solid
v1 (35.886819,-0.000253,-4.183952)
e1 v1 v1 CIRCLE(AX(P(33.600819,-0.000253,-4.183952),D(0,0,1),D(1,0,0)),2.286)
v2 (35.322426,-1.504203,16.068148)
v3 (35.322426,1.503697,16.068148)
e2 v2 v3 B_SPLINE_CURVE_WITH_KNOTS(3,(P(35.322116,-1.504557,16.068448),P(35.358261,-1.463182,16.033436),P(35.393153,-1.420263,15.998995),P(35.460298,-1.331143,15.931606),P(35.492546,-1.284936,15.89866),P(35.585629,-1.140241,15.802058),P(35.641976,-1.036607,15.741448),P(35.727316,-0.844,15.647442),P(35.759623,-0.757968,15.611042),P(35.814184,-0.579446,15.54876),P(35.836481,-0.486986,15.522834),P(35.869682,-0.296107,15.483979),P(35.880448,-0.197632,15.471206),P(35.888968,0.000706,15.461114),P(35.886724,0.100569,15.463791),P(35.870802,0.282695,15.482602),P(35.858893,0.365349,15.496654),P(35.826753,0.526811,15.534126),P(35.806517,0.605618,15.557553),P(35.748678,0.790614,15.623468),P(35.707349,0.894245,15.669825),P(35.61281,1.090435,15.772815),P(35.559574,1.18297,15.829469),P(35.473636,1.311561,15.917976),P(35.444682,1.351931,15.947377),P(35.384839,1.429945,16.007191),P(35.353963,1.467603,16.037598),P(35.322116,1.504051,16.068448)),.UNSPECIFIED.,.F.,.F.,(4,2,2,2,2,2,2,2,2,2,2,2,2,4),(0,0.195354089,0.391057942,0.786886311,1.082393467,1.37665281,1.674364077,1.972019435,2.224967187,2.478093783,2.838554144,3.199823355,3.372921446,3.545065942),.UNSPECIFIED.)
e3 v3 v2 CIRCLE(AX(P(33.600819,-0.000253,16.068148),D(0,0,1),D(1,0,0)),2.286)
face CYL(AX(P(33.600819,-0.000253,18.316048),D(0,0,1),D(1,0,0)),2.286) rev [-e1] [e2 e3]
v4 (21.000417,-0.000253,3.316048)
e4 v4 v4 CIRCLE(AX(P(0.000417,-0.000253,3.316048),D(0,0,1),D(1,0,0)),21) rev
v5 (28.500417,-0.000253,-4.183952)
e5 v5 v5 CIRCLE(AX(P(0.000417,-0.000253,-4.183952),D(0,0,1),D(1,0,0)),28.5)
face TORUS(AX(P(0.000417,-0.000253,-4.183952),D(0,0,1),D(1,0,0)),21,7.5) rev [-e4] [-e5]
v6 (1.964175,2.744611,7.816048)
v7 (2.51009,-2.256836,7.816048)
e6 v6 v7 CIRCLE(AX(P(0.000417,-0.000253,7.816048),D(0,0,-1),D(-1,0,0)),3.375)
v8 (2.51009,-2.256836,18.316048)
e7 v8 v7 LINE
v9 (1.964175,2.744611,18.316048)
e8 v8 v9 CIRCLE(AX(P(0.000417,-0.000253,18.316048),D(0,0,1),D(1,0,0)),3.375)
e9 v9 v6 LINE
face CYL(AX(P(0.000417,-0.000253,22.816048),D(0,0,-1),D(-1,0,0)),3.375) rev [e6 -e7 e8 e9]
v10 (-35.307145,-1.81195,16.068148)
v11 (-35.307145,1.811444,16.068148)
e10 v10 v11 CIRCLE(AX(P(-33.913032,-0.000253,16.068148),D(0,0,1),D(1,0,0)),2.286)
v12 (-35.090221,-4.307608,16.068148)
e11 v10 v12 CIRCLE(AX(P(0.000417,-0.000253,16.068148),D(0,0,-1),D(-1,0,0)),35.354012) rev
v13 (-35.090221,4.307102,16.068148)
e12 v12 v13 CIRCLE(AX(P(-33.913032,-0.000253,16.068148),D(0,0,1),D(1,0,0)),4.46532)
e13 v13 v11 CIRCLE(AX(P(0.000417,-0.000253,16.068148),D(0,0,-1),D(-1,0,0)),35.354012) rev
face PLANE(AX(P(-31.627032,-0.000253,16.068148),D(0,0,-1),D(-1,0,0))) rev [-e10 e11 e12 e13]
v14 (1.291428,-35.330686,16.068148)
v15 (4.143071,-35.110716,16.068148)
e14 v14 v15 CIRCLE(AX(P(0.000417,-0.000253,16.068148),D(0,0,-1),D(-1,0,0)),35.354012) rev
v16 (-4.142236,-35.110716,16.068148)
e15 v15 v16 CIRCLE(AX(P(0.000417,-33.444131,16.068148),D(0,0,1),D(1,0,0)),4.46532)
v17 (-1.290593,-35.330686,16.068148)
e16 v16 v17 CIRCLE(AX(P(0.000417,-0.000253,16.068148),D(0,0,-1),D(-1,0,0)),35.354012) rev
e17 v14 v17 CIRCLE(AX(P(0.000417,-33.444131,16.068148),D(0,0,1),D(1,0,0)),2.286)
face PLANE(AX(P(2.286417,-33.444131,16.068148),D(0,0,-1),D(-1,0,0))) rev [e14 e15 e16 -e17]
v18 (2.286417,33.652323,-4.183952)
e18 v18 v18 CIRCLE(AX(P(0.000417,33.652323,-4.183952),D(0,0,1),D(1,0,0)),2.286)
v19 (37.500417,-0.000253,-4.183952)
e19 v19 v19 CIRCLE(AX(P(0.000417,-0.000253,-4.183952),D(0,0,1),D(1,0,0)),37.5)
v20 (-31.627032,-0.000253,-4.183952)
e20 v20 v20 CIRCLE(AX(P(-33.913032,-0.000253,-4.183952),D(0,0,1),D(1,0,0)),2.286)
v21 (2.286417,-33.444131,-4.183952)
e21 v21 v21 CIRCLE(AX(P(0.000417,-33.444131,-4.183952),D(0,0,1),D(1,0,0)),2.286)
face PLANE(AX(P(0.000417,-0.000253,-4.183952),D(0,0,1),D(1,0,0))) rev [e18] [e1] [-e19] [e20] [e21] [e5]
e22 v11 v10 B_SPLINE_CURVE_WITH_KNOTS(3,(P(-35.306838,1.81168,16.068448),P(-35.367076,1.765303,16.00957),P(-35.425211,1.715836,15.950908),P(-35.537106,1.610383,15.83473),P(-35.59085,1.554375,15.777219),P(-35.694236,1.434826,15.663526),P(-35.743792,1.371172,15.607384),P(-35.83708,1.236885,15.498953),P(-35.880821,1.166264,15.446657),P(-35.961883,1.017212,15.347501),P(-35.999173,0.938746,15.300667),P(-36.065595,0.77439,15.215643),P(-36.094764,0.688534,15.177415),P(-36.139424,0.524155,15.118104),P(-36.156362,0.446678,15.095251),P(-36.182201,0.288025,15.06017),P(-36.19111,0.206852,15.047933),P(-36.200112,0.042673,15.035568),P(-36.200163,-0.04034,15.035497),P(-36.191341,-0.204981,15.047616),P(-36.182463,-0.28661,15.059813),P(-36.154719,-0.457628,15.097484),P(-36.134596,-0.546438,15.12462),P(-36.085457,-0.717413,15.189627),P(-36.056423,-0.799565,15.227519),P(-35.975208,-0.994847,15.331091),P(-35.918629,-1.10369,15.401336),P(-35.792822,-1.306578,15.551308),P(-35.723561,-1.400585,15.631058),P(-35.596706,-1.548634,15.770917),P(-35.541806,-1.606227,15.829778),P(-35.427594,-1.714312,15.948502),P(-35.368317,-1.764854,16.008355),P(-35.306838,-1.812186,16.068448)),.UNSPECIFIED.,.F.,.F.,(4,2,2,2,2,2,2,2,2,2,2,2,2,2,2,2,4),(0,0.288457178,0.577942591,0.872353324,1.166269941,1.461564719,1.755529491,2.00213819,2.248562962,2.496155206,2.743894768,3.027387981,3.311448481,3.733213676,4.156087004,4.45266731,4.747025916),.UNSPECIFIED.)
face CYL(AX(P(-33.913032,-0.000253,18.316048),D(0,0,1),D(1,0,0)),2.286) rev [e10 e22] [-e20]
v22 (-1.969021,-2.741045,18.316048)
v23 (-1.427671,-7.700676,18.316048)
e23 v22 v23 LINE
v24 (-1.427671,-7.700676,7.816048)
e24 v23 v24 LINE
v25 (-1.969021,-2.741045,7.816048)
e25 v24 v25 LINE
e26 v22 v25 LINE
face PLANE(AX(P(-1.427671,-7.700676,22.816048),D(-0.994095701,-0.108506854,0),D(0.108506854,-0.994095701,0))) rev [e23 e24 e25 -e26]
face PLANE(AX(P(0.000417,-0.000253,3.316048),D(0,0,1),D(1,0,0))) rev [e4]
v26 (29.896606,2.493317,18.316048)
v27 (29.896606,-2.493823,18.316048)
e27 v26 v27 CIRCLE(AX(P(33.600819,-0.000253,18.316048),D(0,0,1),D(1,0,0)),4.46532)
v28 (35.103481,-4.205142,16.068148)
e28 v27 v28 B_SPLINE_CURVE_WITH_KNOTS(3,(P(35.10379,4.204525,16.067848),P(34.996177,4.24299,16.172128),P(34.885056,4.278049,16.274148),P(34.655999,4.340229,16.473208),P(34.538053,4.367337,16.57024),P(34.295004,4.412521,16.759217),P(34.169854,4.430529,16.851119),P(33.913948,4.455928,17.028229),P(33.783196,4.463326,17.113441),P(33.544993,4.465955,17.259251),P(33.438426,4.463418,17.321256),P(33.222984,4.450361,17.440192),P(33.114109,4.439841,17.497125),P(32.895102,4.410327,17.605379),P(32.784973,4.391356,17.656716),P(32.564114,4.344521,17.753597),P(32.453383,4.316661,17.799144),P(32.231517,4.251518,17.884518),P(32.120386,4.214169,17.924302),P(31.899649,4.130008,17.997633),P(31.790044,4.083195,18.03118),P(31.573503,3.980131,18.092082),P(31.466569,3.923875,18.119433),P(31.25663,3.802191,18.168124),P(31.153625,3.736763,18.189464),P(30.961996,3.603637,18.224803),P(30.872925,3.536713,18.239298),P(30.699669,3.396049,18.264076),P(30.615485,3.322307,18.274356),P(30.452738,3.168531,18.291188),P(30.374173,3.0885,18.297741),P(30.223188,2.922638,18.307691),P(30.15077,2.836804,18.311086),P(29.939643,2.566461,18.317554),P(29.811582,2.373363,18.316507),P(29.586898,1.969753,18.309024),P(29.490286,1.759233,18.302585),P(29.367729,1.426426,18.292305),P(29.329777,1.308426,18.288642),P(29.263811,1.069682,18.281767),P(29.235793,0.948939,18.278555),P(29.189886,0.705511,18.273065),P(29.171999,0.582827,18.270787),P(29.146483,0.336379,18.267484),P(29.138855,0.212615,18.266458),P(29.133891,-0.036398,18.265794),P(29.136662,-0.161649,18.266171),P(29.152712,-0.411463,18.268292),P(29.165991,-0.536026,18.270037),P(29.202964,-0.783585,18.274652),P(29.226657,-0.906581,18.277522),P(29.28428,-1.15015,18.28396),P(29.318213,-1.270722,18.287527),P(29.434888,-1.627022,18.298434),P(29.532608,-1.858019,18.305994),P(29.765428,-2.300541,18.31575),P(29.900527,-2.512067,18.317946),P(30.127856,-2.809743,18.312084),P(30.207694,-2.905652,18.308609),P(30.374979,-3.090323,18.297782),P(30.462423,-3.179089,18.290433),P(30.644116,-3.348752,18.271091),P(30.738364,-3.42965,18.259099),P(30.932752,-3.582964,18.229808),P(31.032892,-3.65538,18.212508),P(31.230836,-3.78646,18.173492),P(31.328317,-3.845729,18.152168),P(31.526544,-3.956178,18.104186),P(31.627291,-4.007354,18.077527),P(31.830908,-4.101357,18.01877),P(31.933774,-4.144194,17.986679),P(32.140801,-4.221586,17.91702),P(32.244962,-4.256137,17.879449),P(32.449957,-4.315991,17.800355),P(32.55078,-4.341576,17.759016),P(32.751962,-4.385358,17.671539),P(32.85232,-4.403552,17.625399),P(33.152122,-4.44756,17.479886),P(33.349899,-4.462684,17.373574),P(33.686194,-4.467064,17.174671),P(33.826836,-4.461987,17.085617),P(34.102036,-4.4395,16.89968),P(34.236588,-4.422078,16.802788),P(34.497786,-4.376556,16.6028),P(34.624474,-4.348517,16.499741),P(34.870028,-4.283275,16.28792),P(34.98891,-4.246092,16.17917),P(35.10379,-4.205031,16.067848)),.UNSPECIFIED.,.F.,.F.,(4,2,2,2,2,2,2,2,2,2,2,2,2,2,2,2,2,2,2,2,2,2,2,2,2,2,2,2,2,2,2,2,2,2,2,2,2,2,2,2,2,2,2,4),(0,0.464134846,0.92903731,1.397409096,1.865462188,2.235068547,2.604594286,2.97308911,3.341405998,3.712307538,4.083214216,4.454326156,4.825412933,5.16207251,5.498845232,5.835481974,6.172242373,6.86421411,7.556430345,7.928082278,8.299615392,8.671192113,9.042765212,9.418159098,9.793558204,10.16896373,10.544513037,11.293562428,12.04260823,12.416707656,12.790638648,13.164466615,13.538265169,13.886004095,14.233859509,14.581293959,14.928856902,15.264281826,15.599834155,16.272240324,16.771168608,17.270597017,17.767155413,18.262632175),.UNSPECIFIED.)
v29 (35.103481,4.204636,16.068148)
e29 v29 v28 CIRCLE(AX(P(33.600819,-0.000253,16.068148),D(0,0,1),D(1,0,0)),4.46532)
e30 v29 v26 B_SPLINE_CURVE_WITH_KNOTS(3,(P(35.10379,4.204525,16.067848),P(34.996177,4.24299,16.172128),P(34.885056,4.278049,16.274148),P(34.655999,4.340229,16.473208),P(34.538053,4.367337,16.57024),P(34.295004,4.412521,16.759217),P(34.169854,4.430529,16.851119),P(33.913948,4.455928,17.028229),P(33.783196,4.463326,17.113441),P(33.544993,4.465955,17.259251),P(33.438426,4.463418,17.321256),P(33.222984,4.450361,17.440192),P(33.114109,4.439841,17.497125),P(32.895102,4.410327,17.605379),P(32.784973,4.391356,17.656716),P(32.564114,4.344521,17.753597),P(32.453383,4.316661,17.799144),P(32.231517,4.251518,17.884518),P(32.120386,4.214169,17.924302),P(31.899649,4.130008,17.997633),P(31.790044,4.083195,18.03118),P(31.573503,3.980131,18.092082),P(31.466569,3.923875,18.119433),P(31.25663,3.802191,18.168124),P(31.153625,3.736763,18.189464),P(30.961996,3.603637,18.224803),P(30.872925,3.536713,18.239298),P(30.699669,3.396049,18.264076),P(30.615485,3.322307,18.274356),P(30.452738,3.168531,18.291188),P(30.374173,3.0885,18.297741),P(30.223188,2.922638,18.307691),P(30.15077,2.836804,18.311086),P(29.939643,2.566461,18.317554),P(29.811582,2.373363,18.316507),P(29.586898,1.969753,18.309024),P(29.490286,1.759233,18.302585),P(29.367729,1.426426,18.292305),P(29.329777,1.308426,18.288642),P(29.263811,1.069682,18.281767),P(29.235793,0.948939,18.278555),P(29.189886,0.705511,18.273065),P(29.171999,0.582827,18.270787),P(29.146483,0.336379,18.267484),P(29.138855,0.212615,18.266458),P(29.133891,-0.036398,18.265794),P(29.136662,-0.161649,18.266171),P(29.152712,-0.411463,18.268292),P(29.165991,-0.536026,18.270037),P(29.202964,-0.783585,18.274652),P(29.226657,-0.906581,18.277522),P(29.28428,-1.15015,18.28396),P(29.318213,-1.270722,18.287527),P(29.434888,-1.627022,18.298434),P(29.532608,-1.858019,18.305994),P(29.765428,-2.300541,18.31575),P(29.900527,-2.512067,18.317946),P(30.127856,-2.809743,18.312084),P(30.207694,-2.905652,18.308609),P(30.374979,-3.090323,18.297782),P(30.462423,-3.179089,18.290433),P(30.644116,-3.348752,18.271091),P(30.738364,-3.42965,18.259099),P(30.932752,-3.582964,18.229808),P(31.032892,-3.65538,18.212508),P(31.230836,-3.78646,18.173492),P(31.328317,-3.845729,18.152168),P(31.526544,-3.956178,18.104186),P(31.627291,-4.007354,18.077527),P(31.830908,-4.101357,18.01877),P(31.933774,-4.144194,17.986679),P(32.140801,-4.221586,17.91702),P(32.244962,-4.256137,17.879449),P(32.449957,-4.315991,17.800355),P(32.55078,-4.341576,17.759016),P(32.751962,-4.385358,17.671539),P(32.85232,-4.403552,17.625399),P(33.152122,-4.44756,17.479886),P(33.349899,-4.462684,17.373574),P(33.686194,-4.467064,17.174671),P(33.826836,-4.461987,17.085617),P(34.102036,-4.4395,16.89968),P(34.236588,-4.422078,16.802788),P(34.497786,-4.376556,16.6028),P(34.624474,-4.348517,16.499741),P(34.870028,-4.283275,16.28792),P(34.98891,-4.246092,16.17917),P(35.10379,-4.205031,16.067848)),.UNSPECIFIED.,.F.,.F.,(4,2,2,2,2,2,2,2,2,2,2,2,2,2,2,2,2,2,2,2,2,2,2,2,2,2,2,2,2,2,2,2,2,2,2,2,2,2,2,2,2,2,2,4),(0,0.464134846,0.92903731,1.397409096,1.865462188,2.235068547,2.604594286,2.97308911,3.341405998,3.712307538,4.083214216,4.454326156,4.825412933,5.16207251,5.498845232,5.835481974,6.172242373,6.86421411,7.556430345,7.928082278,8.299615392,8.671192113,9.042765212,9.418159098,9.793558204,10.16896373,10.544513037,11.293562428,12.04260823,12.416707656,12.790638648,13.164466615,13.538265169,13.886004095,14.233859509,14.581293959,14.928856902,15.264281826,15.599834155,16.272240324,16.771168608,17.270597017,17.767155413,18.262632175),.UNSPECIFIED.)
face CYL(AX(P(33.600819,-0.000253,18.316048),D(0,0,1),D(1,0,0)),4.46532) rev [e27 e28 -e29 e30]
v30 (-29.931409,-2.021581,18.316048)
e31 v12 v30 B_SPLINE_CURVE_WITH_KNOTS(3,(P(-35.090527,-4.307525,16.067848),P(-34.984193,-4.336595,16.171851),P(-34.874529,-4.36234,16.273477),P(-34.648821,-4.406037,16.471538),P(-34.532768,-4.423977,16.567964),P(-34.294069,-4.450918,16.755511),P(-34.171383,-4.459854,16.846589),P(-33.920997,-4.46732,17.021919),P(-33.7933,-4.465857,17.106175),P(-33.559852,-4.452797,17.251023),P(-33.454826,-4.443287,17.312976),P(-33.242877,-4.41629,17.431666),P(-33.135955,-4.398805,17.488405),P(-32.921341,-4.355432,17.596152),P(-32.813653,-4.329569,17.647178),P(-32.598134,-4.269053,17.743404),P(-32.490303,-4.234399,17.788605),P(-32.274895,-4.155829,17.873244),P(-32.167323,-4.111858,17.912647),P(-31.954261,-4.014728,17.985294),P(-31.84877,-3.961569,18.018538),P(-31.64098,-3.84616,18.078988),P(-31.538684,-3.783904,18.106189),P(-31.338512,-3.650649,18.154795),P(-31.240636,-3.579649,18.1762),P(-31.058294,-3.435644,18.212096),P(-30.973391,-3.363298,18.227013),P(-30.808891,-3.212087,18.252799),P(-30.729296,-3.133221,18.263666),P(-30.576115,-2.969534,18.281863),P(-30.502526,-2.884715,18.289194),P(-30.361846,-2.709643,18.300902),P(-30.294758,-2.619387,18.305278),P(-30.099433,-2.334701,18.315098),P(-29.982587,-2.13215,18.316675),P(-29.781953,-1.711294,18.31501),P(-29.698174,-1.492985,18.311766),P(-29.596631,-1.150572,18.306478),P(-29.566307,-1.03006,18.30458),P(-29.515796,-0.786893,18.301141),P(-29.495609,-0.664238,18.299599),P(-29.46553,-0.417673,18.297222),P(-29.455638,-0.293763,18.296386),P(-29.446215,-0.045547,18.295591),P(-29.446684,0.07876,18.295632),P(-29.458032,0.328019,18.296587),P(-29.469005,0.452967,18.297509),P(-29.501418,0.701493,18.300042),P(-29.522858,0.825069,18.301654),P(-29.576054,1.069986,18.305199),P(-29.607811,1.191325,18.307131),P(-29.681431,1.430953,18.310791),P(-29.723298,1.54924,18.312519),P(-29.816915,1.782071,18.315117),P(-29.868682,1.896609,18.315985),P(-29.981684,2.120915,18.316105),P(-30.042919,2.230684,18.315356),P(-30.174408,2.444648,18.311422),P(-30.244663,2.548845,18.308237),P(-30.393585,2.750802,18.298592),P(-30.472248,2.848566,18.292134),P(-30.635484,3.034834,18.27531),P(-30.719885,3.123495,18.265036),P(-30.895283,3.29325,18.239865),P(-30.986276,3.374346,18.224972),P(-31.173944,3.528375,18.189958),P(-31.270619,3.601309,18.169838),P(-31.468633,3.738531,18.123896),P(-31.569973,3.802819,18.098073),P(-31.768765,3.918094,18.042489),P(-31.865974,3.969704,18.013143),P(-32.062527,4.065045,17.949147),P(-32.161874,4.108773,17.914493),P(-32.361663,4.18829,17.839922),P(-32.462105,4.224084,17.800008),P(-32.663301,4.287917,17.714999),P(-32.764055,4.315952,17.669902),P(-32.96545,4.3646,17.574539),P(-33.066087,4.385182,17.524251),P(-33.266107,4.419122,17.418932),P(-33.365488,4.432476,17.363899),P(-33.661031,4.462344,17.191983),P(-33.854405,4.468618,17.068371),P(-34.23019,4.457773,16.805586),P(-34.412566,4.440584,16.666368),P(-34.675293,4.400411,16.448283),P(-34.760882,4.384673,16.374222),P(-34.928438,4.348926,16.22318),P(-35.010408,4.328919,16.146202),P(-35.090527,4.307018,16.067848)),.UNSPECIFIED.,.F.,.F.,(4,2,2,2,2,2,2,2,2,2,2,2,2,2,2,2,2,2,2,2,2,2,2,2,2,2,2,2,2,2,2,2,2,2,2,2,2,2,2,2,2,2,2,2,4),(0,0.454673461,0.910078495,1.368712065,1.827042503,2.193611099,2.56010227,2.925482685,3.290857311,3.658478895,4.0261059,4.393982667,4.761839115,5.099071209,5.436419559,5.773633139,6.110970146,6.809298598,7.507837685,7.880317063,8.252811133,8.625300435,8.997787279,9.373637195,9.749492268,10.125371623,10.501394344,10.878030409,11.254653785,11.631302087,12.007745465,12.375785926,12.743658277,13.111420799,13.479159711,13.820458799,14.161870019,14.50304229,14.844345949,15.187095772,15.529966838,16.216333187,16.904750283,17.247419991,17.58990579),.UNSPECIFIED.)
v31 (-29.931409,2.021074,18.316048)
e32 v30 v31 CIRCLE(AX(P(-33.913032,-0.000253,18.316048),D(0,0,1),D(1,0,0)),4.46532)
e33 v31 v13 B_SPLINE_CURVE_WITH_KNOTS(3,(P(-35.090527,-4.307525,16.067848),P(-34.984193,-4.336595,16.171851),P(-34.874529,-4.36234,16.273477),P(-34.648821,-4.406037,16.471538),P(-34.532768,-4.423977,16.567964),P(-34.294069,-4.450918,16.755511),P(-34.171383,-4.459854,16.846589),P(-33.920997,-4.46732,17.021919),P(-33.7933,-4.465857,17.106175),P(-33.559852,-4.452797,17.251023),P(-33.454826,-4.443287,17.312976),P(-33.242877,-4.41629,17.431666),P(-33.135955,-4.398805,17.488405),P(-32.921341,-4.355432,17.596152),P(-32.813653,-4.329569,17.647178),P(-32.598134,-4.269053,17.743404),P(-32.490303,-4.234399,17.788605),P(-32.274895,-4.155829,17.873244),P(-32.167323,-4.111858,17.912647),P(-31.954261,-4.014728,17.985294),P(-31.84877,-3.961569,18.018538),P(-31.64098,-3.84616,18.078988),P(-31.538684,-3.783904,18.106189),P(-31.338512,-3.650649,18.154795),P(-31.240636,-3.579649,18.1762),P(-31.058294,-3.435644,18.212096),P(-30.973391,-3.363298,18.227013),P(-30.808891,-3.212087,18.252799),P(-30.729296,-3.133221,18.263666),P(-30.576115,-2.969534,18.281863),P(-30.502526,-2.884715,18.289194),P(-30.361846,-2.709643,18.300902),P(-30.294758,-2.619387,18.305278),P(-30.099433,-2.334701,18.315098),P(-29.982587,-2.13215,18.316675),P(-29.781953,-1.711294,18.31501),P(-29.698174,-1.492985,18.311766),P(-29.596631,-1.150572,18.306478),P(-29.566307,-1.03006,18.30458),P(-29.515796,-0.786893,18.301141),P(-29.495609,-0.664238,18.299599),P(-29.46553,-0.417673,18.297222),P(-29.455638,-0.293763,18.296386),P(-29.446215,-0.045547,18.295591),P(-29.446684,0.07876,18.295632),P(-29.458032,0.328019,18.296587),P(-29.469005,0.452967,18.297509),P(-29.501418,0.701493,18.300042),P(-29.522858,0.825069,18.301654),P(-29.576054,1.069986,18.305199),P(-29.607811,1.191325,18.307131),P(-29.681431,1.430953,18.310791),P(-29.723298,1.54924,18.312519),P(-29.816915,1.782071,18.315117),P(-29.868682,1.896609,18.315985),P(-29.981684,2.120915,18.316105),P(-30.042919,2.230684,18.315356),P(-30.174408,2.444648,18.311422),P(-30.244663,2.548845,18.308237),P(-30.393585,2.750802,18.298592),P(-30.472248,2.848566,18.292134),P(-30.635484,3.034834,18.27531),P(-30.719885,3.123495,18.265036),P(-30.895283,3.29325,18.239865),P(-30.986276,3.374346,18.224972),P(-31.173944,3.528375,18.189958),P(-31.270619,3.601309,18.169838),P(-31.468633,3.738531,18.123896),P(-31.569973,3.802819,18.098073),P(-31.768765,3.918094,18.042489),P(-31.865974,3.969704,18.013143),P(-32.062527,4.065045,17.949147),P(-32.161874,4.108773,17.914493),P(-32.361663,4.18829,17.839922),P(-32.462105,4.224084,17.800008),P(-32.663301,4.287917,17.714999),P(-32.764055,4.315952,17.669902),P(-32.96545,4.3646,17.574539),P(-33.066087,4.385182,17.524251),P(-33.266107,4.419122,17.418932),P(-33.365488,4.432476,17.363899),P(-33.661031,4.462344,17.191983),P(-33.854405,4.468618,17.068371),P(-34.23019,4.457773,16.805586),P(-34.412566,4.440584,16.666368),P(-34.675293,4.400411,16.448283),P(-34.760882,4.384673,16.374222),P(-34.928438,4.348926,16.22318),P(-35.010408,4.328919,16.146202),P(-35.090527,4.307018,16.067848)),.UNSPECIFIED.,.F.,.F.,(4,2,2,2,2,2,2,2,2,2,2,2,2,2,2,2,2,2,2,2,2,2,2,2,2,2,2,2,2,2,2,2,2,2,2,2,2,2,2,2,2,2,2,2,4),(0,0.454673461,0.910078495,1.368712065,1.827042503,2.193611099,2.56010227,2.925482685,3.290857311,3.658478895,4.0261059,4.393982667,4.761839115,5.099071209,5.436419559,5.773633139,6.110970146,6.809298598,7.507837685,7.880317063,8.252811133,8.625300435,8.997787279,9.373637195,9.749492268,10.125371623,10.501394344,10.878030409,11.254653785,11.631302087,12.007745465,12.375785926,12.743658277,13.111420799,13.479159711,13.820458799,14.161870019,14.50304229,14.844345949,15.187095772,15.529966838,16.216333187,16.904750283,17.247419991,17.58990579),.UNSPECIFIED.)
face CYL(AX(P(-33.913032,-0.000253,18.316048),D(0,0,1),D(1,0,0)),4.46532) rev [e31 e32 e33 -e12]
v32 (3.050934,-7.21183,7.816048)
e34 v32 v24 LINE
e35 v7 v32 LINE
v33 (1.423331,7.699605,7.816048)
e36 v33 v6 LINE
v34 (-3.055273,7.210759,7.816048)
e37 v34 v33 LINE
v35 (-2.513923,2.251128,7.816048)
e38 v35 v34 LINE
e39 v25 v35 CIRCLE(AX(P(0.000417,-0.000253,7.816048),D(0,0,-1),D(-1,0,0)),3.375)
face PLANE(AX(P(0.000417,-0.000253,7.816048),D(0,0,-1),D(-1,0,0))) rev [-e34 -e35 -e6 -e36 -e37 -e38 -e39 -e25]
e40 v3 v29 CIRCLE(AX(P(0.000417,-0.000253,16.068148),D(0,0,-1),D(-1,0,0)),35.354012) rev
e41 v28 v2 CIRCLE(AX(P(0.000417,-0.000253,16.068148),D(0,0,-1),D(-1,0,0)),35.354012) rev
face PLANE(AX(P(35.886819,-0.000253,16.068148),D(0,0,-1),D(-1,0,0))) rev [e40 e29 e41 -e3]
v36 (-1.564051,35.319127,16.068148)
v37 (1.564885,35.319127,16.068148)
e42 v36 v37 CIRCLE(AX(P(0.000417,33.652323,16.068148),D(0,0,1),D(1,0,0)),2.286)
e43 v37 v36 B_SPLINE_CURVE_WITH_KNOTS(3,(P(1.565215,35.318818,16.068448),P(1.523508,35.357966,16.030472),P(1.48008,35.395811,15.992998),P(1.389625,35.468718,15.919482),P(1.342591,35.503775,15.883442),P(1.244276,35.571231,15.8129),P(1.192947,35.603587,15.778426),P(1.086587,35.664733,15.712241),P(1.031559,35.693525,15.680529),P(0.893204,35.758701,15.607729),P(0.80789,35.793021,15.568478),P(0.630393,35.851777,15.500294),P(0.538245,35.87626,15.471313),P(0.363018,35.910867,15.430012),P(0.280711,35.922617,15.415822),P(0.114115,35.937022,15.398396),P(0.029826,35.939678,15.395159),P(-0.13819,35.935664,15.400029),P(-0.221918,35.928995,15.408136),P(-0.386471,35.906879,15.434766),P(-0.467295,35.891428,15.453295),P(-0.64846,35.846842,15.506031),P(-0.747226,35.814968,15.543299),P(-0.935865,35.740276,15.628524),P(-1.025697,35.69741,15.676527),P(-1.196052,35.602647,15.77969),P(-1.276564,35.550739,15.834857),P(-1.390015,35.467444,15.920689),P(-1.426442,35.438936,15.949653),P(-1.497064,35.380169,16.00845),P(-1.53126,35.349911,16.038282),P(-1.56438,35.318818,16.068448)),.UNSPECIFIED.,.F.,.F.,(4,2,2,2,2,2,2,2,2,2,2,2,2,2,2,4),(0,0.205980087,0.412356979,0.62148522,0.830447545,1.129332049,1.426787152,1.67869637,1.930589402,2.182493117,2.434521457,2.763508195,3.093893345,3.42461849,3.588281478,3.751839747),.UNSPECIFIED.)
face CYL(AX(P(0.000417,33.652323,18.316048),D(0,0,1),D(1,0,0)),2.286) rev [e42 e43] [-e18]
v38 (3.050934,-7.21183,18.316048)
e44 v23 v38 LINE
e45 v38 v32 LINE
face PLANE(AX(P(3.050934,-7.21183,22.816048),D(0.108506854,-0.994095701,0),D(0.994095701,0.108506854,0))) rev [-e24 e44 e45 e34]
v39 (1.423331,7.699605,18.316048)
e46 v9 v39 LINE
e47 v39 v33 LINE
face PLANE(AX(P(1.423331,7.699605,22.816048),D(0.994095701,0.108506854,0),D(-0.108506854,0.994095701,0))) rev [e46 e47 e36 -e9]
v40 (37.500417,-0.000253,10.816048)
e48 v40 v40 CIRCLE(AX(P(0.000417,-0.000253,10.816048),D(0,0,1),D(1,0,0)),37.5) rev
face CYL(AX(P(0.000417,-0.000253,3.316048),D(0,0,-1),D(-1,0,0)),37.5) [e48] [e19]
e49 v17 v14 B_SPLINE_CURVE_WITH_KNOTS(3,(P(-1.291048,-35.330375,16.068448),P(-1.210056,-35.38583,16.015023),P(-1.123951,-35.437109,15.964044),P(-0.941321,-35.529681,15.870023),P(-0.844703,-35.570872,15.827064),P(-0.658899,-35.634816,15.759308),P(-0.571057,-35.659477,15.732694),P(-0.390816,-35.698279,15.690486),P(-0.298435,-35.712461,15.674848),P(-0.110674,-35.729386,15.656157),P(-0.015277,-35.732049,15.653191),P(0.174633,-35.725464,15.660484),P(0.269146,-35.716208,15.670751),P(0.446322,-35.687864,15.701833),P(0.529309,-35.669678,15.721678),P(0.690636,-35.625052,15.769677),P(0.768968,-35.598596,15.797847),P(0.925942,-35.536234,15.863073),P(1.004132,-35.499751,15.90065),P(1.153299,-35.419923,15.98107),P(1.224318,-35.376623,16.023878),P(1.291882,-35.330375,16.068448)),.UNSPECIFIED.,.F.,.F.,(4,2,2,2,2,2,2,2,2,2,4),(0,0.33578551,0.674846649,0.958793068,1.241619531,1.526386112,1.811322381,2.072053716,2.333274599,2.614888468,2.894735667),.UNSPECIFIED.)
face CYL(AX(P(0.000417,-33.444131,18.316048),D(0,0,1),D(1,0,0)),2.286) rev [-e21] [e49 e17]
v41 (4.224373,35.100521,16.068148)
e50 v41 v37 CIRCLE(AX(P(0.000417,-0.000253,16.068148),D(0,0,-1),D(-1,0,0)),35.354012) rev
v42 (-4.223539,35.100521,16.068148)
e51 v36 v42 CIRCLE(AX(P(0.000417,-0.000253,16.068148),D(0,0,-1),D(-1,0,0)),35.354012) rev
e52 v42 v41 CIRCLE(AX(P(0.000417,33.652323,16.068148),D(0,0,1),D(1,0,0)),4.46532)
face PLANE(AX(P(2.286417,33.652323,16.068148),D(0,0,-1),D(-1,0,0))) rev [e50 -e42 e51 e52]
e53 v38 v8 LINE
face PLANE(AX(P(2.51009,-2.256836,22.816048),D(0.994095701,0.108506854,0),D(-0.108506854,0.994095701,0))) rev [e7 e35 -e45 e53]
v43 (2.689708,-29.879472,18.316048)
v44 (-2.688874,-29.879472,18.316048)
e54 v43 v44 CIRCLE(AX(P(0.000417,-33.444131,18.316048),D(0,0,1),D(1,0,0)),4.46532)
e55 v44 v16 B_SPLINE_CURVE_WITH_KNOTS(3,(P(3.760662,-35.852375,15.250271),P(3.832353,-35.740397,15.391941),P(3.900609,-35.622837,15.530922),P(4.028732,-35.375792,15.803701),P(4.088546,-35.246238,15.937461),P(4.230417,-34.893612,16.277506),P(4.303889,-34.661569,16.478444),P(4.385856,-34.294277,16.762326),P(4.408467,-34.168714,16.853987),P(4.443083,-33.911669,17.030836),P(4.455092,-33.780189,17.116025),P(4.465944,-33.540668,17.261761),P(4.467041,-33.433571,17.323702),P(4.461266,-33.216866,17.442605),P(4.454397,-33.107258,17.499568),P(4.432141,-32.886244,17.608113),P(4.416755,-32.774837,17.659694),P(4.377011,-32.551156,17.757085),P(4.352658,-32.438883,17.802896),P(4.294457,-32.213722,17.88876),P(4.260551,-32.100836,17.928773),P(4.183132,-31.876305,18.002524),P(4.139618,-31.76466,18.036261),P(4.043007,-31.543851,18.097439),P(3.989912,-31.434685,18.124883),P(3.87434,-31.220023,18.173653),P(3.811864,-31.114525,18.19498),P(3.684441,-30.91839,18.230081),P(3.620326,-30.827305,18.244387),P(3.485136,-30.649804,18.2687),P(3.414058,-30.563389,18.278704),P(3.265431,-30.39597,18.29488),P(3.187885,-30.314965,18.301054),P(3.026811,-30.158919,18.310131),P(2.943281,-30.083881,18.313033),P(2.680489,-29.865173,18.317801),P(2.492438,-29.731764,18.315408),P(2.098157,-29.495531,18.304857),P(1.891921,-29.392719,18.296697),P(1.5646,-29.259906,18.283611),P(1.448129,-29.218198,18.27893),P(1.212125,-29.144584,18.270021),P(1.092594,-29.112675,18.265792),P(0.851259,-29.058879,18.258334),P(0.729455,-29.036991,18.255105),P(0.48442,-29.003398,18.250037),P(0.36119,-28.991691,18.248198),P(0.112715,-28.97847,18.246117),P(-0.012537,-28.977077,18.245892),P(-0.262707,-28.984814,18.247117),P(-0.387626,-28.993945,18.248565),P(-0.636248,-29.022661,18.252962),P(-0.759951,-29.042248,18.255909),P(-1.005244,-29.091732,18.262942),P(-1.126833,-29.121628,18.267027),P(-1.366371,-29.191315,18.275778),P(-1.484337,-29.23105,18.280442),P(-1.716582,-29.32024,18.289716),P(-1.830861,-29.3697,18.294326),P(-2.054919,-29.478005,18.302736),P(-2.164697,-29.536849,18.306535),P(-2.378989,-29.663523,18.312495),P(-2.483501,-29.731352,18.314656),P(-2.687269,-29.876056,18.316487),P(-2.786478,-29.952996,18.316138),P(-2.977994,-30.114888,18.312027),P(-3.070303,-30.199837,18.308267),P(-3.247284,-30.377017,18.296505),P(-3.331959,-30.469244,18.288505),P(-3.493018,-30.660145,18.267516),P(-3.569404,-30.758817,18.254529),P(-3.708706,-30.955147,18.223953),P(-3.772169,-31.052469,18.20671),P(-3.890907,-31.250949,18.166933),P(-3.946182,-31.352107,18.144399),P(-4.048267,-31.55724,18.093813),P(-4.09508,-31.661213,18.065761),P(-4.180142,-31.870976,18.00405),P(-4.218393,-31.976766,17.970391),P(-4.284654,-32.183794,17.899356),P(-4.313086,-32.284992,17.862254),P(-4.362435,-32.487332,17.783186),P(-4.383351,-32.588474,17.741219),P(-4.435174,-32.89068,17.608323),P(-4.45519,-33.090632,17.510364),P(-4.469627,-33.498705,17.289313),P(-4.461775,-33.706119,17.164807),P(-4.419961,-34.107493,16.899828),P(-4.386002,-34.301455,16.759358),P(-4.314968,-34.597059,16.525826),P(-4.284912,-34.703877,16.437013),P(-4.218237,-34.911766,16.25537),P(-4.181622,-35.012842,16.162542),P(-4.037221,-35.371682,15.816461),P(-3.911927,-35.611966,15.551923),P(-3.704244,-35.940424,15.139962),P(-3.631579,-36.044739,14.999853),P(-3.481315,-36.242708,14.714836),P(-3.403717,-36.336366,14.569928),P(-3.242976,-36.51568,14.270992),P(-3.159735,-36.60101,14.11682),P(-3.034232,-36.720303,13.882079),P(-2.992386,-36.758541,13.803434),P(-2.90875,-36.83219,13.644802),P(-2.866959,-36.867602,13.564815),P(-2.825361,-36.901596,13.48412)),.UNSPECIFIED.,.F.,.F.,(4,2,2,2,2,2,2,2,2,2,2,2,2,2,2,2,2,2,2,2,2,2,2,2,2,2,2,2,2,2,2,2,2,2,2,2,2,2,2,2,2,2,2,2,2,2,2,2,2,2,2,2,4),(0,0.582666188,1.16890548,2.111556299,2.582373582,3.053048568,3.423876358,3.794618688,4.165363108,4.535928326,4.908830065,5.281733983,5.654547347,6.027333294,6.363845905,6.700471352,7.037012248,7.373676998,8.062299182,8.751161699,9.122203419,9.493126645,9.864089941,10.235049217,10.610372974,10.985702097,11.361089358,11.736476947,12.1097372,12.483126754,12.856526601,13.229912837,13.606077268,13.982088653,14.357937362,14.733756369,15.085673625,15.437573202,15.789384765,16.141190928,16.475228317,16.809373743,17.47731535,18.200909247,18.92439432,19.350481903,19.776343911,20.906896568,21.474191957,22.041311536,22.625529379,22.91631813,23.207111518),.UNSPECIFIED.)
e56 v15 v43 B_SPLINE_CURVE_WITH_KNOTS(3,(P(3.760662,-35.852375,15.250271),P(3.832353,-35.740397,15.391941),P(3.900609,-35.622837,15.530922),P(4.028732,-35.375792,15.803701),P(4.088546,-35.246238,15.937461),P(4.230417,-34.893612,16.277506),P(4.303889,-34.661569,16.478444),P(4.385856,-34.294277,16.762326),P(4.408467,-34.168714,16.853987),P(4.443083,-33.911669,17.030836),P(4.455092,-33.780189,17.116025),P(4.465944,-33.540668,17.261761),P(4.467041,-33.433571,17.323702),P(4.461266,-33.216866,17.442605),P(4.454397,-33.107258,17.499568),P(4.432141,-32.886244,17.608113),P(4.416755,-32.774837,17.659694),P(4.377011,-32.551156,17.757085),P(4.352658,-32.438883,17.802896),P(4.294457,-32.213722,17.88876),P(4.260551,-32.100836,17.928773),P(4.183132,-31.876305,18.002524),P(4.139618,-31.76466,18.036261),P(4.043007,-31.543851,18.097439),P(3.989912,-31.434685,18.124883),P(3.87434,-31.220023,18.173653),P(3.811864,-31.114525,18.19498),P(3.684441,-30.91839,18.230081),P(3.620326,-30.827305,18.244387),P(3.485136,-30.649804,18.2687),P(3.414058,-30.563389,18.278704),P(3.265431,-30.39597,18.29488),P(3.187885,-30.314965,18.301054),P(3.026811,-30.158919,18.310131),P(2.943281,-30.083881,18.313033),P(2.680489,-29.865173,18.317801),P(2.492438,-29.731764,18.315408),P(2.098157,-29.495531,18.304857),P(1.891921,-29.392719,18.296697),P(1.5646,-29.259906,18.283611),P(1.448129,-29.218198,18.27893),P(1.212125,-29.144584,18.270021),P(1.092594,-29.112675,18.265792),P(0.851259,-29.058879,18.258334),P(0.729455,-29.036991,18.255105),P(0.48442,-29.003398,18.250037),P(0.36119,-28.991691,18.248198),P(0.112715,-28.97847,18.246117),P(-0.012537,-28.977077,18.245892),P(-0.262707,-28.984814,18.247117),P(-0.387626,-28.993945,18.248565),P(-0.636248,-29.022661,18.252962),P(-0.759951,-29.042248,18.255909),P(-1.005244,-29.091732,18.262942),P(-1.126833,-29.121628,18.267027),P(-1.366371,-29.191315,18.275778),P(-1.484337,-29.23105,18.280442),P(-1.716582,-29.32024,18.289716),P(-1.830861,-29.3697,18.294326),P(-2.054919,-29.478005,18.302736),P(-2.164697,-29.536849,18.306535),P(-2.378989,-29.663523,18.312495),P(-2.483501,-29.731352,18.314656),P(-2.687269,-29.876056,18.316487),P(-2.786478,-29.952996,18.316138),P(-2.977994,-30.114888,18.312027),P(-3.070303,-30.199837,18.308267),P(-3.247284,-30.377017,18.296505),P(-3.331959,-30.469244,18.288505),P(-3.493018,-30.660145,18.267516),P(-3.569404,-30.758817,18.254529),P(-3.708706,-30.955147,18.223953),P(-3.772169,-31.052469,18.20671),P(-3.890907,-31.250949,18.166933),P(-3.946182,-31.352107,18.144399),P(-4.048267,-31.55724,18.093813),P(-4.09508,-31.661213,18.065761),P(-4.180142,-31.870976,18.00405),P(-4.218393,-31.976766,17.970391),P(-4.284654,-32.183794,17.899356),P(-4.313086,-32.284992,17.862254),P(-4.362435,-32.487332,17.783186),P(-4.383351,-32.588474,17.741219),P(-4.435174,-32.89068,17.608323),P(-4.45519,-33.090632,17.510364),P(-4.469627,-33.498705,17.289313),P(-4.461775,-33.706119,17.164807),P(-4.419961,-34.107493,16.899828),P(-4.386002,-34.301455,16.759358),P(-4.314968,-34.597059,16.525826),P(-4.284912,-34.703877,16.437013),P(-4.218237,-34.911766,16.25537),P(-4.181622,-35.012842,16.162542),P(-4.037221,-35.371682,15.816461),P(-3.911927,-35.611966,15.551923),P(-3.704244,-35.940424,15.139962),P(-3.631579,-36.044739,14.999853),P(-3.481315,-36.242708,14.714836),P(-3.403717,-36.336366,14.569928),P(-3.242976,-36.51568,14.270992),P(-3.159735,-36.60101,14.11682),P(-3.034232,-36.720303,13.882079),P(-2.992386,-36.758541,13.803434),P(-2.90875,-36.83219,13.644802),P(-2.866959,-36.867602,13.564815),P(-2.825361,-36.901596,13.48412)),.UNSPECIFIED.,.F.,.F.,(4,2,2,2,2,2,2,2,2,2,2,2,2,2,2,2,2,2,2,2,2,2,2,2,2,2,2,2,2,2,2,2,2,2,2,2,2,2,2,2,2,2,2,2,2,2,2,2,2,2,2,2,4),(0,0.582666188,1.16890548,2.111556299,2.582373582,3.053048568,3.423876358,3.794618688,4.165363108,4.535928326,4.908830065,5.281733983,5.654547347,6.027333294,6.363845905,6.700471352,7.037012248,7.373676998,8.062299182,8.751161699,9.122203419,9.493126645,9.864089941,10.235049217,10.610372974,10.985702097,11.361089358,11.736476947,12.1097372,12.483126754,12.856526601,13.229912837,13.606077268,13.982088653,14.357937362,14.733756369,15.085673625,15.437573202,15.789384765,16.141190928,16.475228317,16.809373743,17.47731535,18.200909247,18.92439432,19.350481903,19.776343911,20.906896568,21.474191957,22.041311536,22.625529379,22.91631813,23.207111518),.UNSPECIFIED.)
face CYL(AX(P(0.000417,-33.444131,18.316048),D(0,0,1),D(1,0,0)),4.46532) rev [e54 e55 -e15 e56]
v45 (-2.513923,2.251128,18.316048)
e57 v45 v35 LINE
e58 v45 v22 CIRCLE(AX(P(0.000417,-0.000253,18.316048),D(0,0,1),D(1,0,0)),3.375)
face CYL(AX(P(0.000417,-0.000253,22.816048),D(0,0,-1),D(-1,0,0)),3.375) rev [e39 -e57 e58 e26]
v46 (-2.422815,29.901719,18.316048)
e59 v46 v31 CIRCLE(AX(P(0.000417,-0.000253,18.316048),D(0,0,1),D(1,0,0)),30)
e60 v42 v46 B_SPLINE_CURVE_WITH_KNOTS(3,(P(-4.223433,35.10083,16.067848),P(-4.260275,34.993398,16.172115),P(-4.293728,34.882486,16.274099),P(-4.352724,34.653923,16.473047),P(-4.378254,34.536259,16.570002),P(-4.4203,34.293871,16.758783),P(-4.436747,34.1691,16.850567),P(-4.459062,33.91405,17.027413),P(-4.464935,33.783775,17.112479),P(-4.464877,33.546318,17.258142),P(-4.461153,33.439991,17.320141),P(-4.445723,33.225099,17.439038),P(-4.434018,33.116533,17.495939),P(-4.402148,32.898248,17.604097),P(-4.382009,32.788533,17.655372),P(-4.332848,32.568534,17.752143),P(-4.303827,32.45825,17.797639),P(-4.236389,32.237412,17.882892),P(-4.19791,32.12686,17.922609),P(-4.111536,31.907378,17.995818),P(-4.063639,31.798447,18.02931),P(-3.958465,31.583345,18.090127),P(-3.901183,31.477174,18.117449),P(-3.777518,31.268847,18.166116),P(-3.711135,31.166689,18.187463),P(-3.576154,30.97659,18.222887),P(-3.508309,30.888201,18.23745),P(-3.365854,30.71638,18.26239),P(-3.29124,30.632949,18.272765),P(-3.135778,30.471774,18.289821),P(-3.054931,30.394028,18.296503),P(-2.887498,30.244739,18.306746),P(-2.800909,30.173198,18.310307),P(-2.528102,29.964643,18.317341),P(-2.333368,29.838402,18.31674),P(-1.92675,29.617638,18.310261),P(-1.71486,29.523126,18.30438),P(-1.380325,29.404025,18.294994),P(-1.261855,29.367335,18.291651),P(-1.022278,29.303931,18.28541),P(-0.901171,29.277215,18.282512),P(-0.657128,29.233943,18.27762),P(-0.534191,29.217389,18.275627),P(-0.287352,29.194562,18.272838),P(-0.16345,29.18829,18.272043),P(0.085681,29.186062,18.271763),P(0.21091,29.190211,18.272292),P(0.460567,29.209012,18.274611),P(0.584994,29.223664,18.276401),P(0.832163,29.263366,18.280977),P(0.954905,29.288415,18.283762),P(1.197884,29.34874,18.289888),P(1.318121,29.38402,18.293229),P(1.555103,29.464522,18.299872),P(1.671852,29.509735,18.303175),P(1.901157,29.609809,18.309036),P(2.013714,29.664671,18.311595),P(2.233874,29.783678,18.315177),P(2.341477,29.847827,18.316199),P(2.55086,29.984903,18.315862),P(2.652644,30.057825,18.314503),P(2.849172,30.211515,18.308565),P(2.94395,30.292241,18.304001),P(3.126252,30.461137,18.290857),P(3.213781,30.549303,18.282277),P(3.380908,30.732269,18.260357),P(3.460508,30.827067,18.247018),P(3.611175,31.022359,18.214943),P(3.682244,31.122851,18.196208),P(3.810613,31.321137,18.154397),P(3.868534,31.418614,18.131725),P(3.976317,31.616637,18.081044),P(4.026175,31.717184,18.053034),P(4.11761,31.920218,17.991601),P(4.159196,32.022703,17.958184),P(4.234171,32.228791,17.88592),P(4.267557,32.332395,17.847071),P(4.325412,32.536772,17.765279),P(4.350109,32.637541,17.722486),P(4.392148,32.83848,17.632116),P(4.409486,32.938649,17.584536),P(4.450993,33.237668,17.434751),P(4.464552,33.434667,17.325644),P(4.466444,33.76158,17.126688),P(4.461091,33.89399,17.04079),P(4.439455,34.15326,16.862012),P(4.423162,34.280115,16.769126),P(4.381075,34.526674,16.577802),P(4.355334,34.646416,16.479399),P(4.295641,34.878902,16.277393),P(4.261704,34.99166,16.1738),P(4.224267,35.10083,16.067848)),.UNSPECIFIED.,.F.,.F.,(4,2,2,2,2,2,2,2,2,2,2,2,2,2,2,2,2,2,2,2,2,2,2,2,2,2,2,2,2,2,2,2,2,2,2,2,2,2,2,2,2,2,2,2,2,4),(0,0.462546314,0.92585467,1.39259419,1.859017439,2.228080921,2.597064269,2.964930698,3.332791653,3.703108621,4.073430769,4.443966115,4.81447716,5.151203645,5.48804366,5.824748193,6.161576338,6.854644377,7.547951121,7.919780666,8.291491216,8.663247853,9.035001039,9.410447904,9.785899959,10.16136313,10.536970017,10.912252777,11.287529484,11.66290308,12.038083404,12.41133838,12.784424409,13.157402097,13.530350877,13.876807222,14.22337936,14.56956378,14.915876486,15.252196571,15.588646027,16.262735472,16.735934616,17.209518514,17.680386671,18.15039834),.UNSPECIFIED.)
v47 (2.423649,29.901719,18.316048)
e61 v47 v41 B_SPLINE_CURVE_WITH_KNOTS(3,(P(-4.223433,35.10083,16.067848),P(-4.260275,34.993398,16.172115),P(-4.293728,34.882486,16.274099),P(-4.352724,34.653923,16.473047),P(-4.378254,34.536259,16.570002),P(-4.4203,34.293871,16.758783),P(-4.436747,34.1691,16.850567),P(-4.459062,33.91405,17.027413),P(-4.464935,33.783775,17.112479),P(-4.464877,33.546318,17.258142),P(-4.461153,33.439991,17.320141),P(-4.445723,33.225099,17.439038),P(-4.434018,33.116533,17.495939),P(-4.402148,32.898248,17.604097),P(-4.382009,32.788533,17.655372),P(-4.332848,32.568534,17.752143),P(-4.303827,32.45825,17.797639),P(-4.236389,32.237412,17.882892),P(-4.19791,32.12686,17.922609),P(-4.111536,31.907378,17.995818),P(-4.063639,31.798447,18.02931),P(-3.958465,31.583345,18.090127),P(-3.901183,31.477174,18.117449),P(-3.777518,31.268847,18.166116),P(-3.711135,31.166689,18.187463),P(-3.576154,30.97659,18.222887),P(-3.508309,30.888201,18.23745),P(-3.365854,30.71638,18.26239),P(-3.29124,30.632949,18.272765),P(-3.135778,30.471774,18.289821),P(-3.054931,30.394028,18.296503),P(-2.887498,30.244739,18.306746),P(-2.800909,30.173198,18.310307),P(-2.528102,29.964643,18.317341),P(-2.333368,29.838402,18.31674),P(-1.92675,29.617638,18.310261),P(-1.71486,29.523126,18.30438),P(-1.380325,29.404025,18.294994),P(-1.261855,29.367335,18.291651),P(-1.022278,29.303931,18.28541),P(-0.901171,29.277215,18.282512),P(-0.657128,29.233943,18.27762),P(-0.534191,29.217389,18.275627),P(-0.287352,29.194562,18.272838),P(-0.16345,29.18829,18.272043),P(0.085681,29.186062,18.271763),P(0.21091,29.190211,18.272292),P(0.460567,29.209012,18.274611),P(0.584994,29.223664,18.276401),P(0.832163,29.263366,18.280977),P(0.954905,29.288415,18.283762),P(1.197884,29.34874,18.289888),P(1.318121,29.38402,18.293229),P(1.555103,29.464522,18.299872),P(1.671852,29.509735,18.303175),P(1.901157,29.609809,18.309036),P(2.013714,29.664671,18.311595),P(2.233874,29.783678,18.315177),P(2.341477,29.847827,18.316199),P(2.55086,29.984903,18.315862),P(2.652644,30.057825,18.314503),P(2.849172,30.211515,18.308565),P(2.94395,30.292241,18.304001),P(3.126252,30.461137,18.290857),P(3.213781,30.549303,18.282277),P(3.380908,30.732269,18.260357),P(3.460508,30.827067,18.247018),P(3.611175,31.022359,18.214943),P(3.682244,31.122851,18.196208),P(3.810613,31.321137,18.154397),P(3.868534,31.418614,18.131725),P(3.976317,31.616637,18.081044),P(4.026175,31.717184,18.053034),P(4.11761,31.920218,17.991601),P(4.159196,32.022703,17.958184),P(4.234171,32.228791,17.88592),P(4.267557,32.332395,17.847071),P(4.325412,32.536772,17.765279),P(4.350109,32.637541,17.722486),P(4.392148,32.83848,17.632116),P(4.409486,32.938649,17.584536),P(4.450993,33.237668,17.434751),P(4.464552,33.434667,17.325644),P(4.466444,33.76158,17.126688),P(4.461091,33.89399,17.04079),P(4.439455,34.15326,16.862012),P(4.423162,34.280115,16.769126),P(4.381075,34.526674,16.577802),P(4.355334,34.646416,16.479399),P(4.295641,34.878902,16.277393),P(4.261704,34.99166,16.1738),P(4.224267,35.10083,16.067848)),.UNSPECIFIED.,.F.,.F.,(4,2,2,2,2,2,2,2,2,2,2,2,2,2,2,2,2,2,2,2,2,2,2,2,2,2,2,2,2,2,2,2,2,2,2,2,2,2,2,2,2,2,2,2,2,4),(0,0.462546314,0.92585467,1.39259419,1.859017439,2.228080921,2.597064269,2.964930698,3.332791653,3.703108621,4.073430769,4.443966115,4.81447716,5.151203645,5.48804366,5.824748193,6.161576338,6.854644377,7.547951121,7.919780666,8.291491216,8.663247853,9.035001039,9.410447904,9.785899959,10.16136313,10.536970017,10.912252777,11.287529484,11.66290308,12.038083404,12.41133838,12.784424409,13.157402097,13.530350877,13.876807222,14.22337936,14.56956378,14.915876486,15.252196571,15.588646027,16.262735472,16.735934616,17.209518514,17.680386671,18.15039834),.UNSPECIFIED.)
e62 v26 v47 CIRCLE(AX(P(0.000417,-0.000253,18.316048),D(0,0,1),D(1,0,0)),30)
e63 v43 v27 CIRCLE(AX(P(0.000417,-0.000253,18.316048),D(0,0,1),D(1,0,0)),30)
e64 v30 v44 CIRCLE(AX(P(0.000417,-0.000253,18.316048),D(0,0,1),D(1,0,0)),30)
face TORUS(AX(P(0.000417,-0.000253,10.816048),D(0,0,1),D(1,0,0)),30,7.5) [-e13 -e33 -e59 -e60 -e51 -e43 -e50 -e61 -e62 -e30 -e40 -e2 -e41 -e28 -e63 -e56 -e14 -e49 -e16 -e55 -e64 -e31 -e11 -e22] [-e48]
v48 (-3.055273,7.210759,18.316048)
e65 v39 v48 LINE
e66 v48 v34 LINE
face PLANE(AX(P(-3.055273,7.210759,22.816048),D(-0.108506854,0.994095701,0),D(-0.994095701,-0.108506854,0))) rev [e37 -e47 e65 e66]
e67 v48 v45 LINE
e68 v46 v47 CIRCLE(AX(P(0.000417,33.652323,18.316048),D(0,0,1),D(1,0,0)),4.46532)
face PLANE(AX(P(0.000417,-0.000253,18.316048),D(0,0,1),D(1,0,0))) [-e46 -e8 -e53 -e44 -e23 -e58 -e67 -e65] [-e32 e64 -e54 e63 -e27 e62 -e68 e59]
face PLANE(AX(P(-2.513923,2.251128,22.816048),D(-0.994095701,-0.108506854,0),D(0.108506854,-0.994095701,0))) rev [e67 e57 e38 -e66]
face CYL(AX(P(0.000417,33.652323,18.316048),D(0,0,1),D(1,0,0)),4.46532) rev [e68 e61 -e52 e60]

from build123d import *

# Parameters (mm, degrees)
SKETCH1_R                                           = 25
SKETCH1_R_2                                         = 19
BOSS_EXTRUDE1_DEPTH                                 = 5
SKETCH2_R                                           = 25
BOSS_EXTRUDE2_DEPTH                                 = 10
FILLET1_R                                           = 5
CBORE_FOR_3_BINDING_HEAD_MACHINE_SCREW1_D           = 3.048
CBORE_FOR_3_BINDING_HEAD_MACHINE_SCREW1_CBORE_D     = 5.95376
CBORE_FOR_3_BINDING_HEAD_MACHINE_SCREW1_CBORE_DEPTH = 1.4986
CUT_EXTRUDE1_START                                  = -3
CUT_EXTRUDE1_DEPTH                                  = 10
SCALE1_SCALE                                        = 1.5


with BuildPart() as part:
    # Sketch1 → Boss-Extrude1 (new body)
    with BuildSketch(Plane.XY):
        Circle(SKETCH1_R)
        Circle(SKETCH1_R_2, mode=Mode.SUBTRACT)
    extrude(amount=BOSS_EXTRUDE1_DEPTH)

    # Sketch2 → Boss-Extrude2 (add)
    with BuildSketch(Plane.XY.offset(5)):
        Circle(SKETCH2_R)
    extrude(amount=BOSS_EXTRUDE2_DEPTH)

    # Fillet1
    fillet1_edges = [part.edges().sort_by_distance(p)[0] for p in [
        (-25, 0, 15),
        (-19, 0, 5),
    ]]
    fillet(fillet1_edges, radius=FILLET1_R - 0.0001)  # a hair under: the kernel refuses the full size

    # CBORE for #3 Binding Head Machine Screw1 (through all)
    with Locations(Plane.XY.offset(15)):
        with Locations((0, 22.435050854), (0, -22.295918756), (22.400267829, 0), (-22.608965977, 0)):
            CounterBoreHole(CBORE_FOR_3_BINDING_HEAD_MACHINE_SCREW1_D / 2, CBORE_FOR_3_BINDING_HEAD_MACHINE_SCREW1_CBORE_D / 2, CBORE_FOR_3_BINDING_HEAD_MACHINE_SCREW1_CBORE_DEPTH)

    # Sketch15 → Cut-Extrude1 (cut)
    with BuildSketch(Plane(origin=(0, 0, 5), x_dir=(-1, 0, 0), z_dir=(0, 0, -1)).offset(CUT_EXTRUDE1_START)):
        with BuildLine():
            Line((1.676226843, 1.500920907), (2.037127027, 4.807341739))
            Line((2.037127027, 4.807341739), (-0.948609283, 5.133238785))
            Line((-0.948609283, 5.133238785), (-1.309172026, 1.829909453))
            ThreePointArc((-1.309172026, 1.829909453), (-1.94216249, 1.136003901), (-2.236715327, 0.244140421))
            ThreePointArc((-2.236715327, 0.244140421), (-2.141502308, -0.690266516), (-1.673115077, -1.504388892))
            Line((-1.673115077, -1.504388892), (-2.03367782, -4.807718225))
            Line((-2.03367782, -4.807718225), (0.952058491, -5.133615271))
            Line((0.952058491, -5.133615271), (1.312958675, -1.827194439))
            ThreePointArc((1.312958675, -1.827194439), (1.943337692, -1.133992334), (2.236715327, -0.244140421))
            ThreePointArc((2.236715327, -0.244140421), (2.142215878, 0.688048787), (1.676226843, 1.500920907))
        make_face()
    extrude(amount=-CUT_EXTRUDE1_DEPTH, mode=Mode.SUBTRACT)


with BuildPart() as part_1:
    # Scale1: scaled about (-0.000833746, 0.000507816, 8.367914089)
    add(part.part.scale(SCALE1_SCALE).moved(Location((0.000416873, -0.000253908, -4.183957044))))


solid = part_1.part
